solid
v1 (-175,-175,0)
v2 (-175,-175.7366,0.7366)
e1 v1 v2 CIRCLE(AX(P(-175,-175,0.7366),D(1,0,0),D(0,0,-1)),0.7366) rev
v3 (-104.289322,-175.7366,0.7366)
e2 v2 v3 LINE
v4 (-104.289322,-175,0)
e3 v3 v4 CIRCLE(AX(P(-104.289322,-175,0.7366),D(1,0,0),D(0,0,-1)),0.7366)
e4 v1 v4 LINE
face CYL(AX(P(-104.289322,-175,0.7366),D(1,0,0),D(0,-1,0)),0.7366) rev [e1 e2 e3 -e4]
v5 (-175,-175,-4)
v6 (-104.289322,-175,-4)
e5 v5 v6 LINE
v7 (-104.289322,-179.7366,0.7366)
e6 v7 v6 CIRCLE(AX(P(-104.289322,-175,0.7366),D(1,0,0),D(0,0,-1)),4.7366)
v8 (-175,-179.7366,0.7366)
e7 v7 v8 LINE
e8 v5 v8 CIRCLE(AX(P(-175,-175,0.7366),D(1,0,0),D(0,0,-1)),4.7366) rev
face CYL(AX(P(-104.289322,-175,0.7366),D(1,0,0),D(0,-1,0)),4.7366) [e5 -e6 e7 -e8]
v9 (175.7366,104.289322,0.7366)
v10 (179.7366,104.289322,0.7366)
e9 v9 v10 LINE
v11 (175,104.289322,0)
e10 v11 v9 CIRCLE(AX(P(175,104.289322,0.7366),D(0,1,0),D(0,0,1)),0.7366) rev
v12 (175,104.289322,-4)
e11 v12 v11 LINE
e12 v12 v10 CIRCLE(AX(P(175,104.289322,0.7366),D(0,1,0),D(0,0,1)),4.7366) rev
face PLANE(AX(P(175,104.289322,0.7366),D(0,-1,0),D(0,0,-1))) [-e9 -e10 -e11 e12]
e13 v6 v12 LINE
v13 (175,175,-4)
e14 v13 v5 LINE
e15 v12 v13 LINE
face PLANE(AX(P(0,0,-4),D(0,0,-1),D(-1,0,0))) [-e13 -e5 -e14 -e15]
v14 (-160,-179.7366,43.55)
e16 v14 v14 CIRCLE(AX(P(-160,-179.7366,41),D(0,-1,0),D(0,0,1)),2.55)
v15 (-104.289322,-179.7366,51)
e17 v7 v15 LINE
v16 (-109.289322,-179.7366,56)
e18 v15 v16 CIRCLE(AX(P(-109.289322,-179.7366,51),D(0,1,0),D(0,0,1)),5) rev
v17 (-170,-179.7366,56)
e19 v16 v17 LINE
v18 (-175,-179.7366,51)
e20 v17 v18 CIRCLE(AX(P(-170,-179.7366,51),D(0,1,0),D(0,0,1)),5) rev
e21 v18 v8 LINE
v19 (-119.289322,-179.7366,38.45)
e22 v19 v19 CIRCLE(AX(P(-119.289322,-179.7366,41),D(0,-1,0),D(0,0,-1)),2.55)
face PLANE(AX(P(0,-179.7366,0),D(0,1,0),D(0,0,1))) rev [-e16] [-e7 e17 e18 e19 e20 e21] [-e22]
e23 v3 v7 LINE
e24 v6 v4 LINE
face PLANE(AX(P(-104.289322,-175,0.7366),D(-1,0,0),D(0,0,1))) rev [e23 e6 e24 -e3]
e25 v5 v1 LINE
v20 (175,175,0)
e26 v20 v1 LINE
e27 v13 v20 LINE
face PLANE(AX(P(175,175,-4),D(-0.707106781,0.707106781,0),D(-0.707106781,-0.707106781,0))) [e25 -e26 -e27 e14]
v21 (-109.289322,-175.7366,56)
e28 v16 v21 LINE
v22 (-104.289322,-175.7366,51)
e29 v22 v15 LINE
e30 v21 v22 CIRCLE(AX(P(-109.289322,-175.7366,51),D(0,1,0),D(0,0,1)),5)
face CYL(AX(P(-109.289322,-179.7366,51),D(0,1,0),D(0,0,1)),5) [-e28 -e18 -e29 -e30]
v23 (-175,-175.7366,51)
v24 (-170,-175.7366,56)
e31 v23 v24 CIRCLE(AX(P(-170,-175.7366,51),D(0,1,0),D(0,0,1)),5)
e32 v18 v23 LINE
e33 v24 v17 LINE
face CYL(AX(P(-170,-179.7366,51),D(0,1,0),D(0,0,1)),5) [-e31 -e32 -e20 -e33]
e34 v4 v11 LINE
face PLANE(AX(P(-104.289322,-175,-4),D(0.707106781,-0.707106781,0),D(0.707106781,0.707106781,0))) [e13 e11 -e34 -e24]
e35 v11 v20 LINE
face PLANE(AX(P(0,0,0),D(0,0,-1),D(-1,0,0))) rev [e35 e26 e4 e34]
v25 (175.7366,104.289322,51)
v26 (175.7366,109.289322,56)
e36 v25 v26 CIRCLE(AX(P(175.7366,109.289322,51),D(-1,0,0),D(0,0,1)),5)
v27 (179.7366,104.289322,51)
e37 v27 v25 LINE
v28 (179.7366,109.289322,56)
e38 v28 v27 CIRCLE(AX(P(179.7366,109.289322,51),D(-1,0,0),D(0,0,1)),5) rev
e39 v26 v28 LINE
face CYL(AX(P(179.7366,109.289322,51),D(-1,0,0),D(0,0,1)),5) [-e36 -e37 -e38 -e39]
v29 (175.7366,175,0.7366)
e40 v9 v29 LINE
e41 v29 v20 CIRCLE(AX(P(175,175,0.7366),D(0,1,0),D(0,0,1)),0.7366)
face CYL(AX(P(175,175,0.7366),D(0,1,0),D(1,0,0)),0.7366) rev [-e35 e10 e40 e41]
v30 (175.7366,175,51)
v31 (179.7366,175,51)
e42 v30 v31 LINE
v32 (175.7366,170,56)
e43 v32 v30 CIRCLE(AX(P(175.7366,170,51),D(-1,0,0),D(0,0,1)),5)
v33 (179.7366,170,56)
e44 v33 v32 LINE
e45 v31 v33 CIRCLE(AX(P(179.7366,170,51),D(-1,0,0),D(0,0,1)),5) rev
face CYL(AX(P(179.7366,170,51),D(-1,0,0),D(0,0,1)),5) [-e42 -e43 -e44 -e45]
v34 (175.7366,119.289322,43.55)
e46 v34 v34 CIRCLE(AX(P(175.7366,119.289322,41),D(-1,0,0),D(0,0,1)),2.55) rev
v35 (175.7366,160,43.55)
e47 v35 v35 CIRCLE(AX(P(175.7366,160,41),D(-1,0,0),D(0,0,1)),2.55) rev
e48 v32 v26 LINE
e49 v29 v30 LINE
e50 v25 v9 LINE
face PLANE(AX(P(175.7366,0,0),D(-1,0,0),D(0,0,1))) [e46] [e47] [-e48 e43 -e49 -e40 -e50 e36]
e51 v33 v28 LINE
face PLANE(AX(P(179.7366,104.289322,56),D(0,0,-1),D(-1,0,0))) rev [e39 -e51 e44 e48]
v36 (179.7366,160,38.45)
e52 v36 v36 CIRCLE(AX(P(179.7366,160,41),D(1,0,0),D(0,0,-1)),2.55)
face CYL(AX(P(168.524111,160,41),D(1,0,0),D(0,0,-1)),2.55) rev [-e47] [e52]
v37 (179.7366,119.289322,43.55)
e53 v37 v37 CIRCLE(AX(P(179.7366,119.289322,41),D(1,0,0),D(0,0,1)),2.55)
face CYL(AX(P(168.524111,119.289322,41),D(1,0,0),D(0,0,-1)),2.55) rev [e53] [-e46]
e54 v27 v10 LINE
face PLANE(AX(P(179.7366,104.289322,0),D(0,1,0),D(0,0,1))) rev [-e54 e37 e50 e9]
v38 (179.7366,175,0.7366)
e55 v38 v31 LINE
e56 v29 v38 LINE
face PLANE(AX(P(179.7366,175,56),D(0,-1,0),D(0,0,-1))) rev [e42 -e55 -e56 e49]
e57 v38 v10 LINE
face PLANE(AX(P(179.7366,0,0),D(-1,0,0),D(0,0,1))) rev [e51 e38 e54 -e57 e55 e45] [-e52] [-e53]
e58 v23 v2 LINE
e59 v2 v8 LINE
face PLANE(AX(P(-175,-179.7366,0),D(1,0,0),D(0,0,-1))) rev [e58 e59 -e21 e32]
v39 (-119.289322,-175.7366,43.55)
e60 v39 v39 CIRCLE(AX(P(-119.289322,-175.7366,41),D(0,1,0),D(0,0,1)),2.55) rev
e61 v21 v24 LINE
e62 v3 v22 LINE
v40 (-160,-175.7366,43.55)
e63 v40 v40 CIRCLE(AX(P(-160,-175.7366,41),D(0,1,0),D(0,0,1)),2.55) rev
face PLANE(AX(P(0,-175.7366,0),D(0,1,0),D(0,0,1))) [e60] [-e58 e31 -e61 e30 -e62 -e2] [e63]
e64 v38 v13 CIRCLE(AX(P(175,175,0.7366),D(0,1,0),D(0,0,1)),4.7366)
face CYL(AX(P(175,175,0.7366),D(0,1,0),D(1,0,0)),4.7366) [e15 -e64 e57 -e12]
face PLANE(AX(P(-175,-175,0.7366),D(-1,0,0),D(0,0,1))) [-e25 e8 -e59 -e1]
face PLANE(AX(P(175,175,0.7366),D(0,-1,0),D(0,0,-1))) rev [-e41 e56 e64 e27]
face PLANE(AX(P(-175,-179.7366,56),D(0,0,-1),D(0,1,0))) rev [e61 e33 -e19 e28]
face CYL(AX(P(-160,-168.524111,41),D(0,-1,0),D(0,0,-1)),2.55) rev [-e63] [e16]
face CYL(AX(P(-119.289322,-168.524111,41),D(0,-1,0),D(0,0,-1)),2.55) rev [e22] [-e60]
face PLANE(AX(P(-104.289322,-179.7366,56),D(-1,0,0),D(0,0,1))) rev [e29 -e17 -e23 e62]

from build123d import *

# Parameters (mm, degrees)
BASE_FLANGE1_DEPTH      = 4
EDGE_FLANGE1_DEPTH      = 70.710678119
EDGE_FLANGE1_BEND_DEPTH = 70.710678119
SKETCH13_R              = 2.55
CUT_EXTRUDE1_DEPTH      = 4
SKETCH14_R              = 2.55
CUT_EXTRUDE2_DEPTH      = 4
FILLET1_R               = 5


# Sheet-metal steps are written as plain solids
with BuildPart() as part:
    # Sketch1 → Base-Flange1 (new body)
    with BuildSketch(Plane.XY):
        Polygon((175, 175), (-175, -175), (-104.289321881, -175), (175, 104.289321881), align=None)
    extrude(amount=-BASE_FLANGE1_DEPTH)

    # Edge-Flange1 section (across the edge) → Edge-Flange1 (add)
    with BuildSketch(Plane(origin=(175.7366, 104.289321881, 0), x_dir=(-1, 0, 0), z_dir=(0, 1, 0))):
        with BuildLine():
            Line((-4, 0.7366), (-4, 56))
            Line((-4, 56), (0, 56))
            Line((0, 56), (0, 0.7366))
            ThreePointArc((0, 0.7366), (0.215745145, 0.215745145), (0.7366, 0))
            Line((0.7366, 0), (0.7366, -4))
            ThreePointArc((0.7366, -4), (-2.61268198, -2.61268198), (-4, 0.7366))
        make_face()
    extrude(amount=EDGE_FLANGE1_DEPTH)

    # Edge-Flange1 section 2 (across the edge) → Edge-Flange1 bend (add)
    with BuildSketch(Plane(origin=(-175, -175.7366, 0), x_dir=(0, 1, 0), z_dir=(1, 0, 0))):
        with BuildLine():
            Line((-4, 0.7366), (-4, 56))
            Line((-4, 56), (0, 56))
            Line((0, 56), (0, 0.7366))
            ThreePointArc((0, 0.7366), (0.215745145, 0.215745145), (0.7366, 0))
            Line((0.7366, 0), (0.7366, -4))
            ThreePointArc((0.7366, -4), (-2.61268198, -2.61268198), (-4, 0.7366))
        make_face()
    extrude(amount=EDGE_FLANGE1_BEND_DEPTH)

    # Sketch13 → Cut-Extrude1 (cut)
    with BuildSketch(Plane(origin=(179.7366, 0, 0), x_dir=(0, 0, -1), z_dir=(1, 0, 0))):
        with Locations((-41, 160)):
            Circle(SKETCH13_R)
        with Locations(Location((-41, 119.289321881, 0), (0, 0, 180))):
            Circle(SKETCH13_R)
    extrude(amount=-CUT_EXTRUDE1_DEPTH, mode=Mode.SUBTRACT)

    # Sketch14 → Cut-Extrude2 (cut)
    with BuildSketch(Plane.XZ.offset(179.7366)):
        with Locations(Location((-119.289321881, 41, 0), (0, 0, 270))):
            Circle(SKETCH14_R)
        with Locations(Location((-160, 41, 0), (0, 0, 90))):
            Circle(SKETCH14_R)
    extrude(amount=-CUT_EXTRUDE2_DEPTH, mode=Mode.SUBTRACT)

    # Fillet1
    fillet1_edges = [part.edges().sort_by_distance(p)[0] for p in [
        (177.7366, 104.289321881, 56),
        (177.7366, 175, 56),
        (-175, -177.7366, 56),
        (-104.289321881, -177.7366, 56),
    ]]
    fillet(fillet1_edges, radius=FILLET1_R)


solid = part.part
